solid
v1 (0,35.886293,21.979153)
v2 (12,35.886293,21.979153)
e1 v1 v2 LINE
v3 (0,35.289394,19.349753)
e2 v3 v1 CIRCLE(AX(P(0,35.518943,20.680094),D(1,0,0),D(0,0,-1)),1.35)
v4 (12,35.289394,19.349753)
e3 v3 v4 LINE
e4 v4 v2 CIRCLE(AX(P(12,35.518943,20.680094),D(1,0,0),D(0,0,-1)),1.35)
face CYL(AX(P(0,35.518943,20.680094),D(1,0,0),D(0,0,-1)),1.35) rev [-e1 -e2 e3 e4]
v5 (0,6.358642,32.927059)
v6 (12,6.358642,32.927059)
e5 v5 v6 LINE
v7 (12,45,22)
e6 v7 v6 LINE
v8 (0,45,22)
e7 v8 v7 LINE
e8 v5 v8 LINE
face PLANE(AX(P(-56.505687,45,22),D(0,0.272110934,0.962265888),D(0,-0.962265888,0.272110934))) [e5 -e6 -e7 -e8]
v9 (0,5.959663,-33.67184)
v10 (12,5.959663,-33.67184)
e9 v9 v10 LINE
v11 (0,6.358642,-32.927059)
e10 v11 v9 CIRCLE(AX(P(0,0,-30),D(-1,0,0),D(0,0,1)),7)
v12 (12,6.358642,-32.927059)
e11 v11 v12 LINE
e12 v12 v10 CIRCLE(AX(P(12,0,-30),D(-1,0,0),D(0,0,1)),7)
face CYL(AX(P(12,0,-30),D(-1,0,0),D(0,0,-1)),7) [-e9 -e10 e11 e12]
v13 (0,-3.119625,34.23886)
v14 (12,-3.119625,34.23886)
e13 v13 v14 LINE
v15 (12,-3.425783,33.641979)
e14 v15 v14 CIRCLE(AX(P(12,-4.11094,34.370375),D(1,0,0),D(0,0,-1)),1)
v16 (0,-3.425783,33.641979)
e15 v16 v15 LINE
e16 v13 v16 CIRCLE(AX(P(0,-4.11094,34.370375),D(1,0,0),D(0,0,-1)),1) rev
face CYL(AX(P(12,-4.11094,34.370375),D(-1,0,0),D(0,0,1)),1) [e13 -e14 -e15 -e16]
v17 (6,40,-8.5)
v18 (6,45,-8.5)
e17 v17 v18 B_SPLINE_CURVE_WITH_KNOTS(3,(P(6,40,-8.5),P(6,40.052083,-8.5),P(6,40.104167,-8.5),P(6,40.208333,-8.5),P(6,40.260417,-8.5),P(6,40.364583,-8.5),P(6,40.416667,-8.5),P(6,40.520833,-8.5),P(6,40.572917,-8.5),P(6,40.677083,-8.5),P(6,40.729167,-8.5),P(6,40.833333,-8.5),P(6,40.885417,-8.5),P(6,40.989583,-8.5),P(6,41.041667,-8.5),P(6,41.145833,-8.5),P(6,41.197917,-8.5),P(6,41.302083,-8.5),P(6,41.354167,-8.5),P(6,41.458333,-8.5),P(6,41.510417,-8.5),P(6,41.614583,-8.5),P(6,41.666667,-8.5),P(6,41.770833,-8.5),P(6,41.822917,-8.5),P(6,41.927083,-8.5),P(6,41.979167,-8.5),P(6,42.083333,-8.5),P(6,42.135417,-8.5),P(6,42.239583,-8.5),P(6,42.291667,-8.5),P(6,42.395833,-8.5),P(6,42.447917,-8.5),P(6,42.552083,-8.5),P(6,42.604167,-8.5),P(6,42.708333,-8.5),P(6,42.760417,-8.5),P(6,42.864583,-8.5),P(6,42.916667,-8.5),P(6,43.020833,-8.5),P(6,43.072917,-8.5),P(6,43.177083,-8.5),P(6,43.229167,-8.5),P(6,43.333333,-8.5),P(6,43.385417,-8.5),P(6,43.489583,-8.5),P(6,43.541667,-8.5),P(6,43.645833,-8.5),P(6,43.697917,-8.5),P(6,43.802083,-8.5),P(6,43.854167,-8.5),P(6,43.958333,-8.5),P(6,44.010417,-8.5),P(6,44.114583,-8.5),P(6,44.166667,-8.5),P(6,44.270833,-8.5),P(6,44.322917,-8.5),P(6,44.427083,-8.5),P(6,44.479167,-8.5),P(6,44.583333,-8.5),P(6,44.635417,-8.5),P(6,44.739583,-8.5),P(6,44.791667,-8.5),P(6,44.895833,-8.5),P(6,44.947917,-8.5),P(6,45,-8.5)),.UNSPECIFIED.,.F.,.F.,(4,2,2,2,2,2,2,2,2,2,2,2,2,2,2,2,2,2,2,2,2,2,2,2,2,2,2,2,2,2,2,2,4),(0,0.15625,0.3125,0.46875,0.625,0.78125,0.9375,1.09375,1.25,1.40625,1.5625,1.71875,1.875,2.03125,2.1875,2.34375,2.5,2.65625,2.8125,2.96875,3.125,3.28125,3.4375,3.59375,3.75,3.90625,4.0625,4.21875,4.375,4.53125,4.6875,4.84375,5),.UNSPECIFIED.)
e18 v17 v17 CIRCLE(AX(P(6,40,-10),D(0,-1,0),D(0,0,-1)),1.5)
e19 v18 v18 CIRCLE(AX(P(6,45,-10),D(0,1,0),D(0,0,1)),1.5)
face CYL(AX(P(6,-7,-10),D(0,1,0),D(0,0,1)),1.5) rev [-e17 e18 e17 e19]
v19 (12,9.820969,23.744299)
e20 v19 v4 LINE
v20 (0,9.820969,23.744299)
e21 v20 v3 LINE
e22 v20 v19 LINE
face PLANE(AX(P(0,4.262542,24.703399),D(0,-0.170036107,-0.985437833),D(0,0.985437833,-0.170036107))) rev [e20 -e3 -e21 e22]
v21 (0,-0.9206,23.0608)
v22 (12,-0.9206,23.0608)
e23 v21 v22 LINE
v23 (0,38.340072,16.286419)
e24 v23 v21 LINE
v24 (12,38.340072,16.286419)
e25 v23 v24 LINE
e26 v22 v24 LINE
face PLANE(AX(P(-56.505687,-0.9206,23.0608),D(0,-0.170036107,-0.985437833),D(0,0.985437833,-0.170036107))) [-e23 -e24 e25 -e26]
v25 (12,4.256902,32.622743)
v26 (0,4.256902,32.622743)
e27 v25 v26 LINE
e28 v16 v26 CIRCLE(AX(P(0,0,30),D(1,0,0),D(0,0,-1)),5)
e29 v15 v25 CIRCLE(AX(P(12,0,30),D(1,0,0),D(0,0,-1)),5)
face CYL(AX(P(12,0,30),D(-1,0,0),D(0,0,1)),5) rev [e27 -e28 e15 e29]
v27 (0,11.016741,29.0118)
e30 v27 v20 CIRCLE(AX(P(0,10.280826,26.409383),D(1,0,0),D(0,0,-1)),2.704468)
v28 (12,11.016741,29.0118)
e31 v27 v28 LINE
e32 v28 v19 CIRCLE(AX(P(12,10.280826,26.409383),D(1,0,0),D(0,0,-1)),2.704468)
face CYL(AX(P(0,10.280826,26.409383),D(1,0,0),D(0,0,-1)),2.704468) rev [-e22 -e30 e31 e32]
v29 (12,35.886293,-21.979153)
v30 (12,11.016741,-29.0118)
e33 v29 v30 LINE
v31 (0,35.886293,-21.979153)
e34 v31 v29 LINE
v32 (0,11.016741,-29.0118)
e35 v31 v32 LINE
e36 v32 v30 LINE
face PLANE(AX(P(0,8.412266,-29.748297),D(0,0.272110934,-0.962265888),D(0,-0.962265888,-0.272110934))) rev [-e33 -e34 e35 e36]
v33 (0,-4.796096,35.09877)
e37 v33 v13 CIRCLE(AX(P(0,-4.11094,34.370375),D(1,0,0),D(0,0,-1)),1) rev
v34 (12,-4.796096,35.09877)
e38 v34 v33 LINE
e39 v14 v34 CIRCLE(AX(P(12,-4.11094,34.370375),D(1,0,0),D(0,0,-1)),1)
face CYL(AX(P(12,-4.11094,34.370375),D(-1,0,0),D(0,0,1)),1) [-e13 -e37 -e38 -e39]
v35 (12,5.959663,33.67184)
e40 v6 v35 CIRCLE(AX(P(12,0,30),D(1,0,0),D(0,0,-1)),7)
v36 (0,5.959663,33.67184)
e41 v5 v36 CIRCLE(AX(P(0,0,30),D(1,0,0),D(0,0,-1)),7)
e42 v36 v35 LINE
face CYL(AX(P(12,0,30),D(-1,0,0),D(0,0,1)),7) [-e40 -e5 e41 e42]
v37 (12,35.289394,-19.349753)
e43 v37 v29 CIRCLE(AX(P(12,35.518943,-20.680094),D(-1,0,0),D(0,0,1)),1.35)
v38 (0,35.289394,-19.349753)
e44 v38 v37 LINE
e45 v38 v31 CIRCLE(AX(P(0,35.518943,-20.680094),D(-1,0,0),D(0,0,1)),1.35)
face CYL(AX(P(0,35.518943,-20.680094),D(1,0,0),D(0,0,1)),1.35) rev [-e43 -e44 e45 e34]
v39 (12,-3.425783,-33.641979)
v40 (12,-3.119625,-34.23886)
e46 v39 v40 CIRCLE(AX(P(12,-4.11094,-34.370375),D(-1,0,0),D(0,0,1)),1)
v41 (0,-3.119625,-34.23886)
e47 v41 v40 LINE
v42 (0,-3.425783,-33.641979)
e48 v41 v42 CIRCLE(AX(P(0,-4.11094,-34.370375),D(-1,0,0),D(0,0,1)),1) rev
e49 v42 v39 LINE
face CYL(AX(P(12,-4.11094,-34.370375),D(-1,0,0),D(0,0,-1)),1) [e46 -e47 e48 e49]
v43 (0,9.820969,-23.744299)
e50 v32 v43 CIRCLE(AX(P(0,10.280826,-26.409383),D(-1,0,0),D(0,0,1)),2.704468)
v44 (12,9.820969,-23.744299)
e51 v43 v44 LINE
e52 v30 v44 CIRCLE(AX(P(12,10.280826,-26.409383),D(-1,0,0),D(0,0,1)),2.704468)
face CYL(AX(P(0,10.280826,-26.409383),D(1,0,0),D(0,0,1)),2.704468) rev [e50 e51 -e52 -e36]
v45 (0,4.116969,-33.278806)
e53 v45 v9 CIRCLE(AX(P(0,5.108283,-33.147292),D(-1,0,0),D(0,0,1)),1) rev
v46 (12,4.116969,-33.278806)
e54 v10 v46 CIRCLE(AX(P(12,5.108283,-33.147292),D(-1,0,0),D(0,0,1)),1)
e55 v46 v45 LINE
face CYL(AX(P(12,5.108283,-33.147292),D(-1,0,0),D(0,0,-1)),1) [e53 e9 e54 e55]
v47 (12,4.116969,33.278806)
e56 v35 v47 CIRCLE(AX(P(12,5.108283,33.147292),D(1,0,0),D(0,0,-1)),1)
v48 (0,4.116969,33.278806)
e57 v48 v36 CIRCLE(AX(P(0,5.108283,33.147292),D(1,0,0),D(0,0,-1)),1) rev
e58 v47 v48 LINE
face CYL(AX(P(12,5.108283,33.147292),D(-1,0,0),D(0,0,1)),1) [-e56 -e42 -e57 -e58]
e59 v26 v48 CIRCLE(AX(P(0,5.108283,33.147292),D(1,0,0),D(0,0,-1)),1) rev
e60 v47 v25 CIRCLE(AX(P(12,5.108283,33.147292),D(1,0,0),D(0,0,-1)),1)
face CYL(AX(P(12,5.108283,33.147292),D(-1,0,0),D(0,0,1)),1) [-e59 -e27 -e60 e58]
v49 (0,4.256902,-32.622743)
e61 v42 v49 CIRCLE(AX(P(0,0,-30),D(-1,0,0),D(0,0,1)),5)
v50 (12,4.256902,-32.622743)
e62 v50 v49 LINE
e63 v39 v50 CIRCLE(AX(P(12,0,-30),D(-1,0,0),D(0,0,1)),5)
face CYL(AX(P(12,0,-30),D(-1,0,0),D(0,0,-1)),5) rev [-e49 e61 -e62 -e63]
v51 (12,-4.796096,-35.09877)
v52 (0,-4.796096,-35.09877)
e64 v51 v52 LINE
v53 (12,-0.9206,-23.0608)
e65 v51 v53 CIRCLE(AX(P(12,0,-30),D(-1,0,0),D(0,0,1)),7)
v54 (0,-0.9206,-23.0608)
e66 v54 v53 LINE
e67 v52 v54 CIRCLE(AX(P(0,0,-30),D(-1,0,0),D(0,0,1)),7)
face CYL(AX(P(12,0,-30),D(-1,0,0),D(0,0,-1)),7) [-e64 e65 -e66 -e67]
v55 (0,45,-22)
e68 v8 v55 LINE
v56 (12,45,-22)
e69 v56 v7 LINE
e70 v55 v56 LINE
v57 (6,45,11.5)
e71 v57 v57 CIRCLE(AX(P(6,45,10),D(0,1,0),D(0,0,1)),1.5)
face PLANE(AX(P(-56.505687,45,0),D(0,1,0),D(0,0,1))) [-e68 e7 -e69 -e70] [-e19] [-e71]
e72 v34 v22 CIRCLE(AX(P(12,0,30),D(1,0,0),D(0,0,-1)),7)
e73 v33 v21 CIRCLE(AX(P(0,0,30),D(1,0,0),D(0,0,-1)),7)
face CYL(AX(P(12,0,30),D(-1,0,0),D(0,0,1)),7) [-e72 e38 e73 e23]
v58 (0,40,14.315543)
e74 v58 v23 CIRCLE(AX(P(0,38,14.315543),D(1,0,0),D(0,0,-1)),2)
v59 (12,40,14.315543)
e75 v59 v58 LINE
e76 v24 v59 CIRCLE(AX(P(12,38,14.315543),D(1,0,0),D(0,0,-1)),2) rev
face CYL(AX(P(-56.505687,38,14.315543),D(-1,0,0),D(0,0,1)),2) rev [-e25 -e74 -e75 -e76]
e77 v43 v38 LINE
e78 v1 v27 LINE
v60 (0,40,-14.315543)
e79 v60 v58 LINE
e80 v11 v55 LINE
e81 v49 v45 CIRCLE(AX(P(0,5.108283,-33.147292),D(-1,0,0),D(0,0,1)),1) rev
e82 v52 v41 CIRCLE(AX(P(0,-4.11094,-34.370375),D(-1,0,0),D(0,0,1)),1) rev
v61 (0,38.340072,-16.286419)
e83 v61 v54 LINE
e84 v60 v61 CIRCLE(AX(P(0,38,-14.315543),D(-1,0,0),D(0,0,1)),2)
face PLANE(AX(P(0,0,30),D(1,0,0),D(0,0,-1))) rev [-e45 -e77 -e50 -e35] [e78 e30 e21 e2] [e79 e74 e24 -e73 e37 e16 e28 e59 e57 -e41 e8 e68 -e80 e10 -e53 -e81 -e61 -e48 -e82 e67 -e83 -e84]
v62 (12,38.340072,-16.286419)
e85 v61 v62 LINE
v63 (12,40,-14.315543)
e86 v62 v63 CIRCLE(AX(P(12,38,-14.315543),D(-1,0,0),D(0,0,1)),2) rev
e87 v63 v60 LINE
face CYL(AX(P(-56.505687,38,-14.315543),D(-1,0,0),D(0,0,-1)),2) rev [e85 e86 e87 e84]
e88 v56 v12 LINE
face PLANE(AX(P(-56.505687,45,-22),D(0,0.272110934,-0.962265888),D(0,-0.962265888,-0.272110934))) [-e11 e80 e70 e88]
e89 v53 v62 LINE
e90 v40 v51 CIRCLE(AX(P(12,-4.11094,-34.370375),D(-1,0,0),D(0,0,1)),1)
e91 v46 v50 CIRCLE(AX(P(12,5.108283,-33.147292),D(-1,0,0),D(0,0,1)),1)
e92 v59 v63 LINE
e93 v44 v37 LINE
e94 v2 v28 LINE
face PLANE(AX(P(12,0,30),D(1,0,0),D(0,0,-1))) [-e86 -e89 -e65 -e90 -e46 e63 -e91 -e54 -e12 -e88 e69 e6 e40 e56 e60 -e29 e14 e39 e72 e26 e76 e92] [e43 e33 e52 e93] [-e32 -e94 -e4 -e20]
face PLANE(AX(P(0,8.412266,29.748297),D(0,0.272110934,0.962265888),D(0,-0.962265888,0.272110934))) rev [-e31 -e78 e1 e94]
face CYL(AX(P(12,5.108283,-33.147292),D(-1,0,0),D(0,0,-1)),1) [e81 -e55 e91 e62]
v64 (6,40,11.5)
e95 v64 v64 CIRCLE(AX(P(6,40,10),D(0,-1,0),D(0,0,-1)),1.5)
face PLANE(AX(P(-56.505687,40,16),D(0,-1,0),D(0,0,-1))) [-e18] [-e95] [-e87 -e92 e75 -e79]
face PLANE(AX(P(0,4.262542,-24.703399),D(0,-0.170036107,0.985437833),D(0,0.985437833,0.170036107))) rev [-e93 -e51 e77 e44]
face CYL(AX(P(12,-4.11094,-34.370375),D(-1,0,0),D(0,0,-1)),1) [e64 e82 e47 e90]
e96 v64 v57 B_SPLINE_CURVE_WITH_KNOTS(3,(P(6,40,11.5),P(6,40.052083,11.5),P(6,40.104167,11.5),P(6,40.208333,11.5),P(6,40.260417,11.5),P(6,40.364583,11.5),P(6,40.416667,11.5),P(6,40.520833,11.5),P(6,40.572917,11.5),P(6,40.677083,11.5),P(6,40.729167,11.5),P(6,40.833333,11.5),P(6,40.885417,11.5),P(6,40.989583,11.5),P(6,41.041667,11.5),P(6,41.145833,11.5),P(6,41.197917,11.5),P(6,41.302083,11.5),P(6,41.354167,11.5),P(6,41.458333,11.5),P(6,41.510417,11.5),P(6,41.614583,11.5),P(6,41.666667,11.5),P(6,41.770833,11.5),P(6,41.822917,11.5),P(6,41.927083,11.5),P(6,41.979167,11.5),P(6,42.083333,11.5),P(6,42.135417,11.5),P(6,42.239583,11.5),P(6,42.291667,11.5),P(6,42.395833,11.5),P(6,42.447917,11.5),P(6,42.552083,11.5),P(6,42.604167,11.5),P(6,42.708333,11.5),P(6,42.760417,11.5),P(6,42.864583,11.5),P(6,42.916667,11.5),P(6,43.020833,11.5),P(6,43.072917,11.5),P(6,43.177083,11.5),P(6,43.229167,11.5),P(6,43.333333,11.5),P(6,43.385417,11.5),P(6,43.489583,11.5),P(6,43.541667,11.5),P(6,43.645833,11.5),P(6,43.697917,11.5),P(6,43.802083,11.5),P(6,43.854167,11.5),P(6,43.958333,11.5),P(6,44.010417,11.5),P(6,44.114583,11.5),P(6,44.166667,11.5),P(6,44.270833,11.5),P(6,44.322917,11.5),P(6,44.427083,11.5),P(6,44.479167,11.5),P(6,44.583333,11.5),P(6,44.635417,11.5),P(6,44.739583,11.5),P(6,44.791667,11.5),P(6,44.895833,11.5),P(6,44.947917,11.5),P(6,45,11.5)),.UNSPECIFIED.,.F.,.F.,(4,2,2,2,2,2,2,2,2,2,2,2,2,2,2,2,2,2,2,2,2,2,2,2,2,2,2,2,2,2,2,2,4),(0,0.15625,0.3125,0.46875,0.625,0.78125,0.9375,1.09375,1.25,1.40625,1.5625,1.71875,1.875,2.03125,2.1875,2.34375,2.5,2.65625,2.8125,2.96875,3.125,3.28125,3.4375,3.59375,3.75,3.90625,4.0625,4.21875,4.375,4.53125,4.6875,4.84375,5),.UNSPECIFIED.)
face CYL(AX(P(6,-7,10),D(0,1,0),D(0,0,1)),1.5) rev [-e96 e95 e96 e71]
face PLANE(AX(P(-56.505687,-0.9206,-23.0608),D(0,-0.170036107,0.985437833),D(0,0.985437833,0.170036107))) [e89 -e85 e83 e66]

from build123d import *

# Parameters (mm, degrees)
SKETCH1_R           = 7
SKETCH1_R_2         = 5
BOSS_EXTRUDE1_DEPTH = 12
CUT_EXTRUDE1_DEPTH  = 40.522145691
FILLET1_R           = 1
BOSS_EXTRUDE2_START = -12
BOSS_EXTRUDE2_DEPTH = 12
FILLET2_R           = 2
CUT_EXTRUDE2_DEPTH  = 59.481408086
SKETCH7_R           = 1.5
CUT_EXTRUDE3_DEPTH  = 65.024019647


with BuildPart() as part:
    # Sketch1 → Boss-Extrude1 (new body)
    with BuildSketch(Plane(origin=(0, 0, 0), x_dir=(0, 0, -1), z_dir=(1, 0, 0))):
        with Locations((-30, 0)):
            Circle(SKETCH1_R)
        with Locations((-30, 0)):
            Circle(SKETCH1_R_2, mode=Mode.SUBTRACT)
    extrude(amount=BOSS_EXTRUDE1_DEPTH)

    # Sketch3 → Cut-Extrude1 (cut, through all)
    with BuildSketch(Plane(origin=(12, 0, 0), x_dir=(0, 0, -1), z_dir=(1, 0, 0))):
        Polygon((-26.132418273, 3.168881756), (-27.092472621, -4.067712446), (-40.54775296, -2.282646151), (-39.587698612, 4.953948051), align=None)
    extrude(amount=-CUT_EXTRUDE1_DEPTH, mode=Mode.SUBTRACT)

    # Fillet1
    fillet1_edges = [part.edges().sort_by_distance(p)[0] for p in [
        (6, 4.067712446, 32.907527379),
        (6, 4.403840469, 35.441156966),
        (6, -3.168881756, 33.867581727),
        (6, -2.832753733, 36.401211314),
    ]]
    fillet(fillet1_edges, radius=FILLET1_R - 0.0001)  # a hair under: the kernel refuses the full size

    # Sketch4 → Boss-Extrude2 (add)
    with BuildSketch(Plane(origin=(12, 0, 0), x_dir=(0, 0, -1), z_dir=(1, 0, 0)).offset(BOSS_EXTRUDE2_START)):
        with BuildLine():
            Line((-23.06080008, -0.92060006), (-16, 40))
            Line((-16, 40), (0, 40))
            Line((0, 40), (0, 45))
            Line((0, 45), (-22, 45))
            Line((-22, 45), (-32.927058907, 6.358641848))
            ThreePointArc((-32.927058907, 6.358641848), (-25.844141537, 5.632835914), (-23.06080008, -0.92060006))
        make_face()
    extrude(amount=BOSS_EXTRUDE2_DEPTH)

    # Fillet2
    fillet2_edges = [part.edges().sort_by_distance(p)[0] for p in [
        (6, 40, 16),
    ]]
    fillet(fillet2_edges, radius=FILLET2_R)

    # Sketch6 → Cut-Extrude2 (cut, through all)
    with BuildSketch(Plane(origin=(12, 0, 0), x_dir=(0, 0, -1), z_dir=(1, 0, 0))):
        with BuildLine():
            Line((-23.744298761, 9.820968741), (-19.349752742, 35.289394134))
            ThreePointArc((-19.349752742, 35.289394134), (-20.381234985, 36.835447129), (-21.979152767, 35.886292641))
            Line((-21.979152767, 35.886292641), (-29.011800399, 11.016740989))
            ThreePointArc((-29.011800399, 11.016740989), (-27.008090108, 7.643460534), (-23.744298761, 9.820968741))
        make_face()
    extrude(amount=-CUT_EXTRUDE2_DEPTH, mode=Mode.SUBTRACT)

    # Mirror9: part across plane


with BuildPart() as part_1:
    add(part.part)
    add(part.part.mirror(Plane(origin=(-56.505687485, 40, 0), x_dir=(1, 0, 0), z_dir=(0, 0, -1))))

    # Sketch7 → Cut-Extrude3 (cut, through all)
    with BuildSketch(Plane(origin=(0, 45, 0), x_dir=(1, 0, 0), z_dir=(0, 1, 0))):
        with Locations(Location((6, -10, 0), (0, 0, 270))):
            Circle(SKETCH7_R)
        with Locations(Location((6, 10, 0), (0, 0, 270))):
            Circle(SKETCH7_R)
    extrude(amount=-CUT_EXTRUDE3_DEPTH, mode=Mode.SUBTRACT)


solid = part_1.part
